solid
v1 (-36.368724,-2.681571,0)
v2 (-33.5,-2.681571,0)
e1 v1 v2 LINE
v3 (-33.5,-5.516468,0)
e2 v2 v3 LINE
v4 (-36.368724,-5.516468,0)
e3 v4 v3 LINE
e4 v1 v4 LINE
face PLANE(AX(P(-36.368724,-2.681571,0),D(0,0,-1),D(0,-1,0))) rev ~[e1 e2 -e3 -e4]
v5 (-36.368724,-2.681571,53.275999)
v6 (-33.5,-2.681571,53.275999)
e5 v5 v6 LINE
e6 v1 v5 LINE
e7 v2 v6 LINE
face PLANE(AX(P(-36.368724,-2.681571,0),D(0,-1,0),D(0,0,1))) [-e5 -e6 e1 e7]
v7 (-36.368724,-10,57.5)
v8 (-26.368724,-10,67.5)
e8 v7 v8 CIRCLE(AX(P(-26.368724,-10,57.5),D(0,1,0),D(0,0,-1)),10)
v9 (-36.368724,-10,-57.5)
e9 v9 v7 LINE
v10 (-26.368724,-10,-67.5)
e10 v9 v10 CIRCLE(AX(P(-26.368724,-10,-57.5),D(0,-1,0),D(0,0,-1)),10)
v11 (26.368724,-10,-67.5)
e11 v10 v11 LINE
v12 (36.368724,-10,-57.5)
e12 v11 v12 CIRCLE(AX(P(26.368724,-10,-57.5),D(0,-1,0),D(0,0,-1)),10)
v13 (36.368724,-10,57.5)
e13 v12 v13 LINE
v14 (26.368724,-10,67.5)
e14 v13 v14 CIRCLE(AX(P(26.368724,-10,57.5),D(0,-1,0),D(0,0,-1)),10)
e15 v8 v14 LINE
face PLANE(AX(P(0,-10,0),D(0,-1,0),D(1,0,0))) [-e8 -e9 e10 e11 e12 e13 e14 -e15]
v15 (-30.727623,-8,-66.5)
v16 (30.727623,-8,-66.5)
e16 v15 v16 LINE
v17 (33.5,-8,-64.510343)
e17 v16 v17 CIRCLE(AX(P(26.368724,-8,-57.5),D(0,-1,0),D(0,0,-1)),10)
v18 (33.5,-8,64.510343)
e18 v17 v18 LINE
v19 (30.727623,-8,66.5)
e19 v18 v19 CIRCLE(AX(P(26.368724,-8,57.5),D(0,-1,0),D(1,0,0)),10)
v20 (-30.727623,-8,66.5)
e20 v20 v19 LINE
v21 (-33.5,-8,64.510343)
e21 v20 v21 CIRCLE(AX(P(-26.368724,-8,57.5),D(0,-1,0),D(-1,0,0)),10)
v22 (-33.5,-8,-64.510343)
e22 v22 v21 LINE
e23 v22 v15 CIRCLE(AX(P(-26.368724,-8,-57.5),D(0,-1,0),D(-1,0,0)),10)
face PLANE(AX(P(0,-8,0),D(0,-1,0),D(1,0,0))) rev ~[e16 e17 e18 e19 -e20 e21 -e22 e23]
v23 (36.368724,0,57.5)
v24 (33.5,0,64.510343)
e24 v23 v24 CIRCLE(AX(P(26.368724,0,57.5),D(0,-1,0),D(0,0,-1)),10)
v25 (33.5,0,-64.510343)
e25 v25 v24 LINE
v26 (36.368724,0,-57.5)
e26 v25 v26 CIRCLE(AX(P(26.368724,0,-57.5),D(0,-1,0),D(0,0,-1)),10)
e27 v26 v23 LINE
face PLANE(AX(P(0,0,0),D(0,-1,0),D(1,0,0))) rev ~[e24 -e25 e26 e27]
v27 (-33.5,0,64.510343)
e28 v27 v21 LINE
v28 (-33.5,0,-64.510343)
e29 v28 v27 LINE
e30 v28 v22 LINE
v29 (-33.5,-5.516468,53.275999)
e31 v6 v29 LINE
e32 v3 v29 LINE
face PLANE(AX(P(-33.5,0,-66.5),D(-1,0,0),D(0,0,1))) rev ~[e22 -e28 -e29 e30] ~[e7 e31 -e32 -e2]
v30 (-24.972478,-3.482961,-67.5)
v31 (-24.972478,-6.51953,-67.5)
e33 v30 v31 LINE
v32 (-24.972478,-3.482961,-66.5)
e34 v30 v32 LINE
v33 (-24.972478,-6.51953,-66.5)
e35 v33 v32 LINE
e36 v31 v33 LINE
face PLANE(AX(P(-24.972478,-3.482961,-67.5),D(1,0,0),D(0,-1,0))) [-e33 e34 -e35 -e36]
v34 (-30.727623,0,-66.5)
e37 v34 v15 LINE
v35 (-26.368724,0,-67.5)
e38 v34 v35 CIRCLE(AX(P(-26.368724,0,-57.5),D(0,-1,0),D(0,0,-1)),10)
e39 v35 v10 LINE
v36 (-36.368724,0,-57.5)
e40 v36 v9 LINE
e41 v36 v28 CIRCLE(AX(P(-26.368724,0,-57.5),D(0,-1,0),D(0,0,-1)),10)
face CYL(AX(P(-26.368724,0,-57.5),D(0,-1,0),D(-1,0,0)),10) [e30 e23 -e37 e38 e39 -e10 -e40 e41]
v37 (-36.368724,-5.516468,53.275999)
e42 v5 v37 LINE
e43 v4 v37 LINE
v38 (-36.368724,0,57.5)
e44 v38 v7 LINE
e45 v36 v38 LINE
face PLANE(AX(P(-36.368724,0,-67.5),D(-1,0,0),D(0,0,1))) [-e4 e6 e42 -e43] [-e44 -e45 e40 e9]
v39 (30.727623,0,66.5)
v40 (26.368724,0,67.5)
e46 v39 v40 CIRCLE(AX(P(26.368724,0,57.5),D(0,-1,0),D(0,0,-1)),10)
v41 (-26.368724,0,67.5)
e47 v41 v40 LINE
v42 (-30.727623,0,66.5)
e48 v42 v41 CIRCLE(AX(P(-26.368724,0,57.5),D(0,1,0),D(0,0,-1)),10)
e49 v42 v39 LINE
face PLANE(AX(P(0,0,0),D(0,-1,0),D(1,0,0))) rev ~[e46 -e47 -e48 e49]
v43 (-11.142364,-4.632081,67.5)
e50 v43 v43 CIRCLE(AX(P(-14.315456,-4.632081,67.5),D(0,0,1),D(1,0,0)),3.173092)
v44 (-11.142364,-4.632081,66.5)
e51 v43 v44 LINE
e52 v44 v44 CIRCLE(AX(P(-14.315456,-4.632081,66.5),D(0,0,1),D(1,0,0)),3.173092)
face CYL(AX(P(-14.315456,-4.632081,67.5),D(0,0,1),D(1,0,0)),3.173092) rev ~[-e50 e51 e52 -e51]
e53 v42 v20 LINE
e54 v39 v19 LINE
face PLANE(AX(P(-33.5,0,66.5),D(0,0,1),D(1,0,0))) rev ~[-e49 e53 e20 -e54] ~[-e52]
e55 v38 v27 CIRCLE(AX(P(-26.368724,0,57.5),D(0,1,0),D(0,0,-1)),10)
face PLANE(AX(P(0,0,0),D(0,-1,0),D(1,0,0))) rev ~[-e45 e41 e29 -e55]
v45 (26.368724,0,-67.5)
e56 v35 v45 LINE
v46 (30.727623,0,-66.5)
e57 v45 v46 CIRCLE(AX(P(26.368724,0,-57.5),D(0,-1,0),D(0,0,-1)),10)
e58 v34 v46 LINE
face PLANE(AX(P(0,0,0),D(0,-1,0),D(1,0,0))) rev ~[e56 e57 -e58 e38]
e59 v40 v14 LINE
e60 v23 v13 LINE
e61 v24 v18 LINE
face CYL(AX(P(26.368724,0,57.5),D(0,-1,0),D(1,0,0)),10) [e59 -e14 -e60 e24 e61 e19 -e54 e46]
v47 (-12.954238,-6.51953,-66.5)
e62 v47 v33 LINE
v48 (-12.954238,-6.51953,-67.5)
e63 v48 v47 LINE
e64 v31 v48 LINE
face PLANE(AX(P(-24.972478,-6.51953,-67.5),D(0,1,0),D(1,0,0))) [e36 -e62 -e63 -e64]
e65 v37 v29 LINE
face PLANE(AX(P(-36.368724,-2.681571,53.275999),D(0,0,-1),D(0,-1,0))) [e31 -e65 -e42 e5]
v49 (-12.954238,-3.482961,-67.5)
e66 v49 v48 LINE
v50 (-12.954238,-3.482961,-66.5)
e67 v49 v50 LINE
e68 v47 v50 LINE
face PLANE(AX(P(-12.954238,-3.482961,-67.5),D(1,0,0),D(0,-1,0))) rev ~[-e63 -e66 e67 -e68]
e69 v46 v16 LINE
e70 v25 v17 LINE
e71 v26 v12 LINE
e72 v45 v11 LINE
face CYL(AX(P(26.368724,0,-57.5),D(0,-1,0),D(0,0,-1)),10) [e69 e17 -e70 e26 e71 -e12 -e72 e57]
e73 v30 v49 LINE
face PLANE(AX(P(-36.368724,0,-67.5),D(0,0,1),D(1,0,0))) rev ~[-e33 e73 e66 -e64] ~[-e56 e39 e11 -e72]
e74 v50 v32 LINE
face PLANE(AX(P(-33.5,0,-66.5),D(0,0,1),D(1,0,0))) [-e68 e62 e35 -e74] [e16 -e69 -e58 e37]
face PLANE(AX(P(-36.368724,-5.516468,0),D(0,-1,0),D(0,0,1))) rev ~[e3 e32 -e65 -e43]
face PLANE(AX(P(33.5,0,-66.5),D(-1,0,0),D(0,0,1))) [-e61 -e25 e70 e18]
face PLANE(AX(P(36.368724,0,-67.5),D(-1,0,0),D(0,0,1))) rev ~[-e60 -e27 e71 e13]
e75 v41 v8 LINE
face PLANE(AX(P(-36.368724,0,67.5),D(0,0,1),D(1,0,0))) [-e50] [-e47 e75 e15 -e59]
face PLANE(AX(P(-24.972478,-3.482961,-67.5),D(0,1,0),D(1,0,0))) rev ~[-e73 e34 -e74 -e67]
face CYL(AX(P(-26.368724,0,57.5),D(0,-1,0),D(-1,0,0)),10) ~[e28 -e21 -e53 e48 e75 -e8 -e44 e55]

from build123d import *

# Parameters (mm, degrees)
F0_W      = 72.7374479175
F0_H      = 135
F1_DEPTH  = 10
F2_R      = 10
F3_W      = 67
F3_H      = 133
F4_DEPTH  = 8
F5_W      = 12.0182400569
F5_H      = 3.036568407
F6_DEPTH  = 25
F7_R      = 3.1730919104
F8_DEPTH  = 12
F9_W      = 2.8348967899
F9_H      = 53.2759986818
F10_DEPTH = 12


# Not quite as in the source:
# - a feature of the source that left no trace in its solid (it failed there, or was rolled back) is left out


with BuildPart() as f1:
    # F0 (on Front) → F1 (new body)
    with BuildSketch(Plane.XZ):
        Rectangle(F0_W, F0_H)
    extrude(amount=F1_DEPTH)

    # F2
    f2_edges = [f1.edges().sort_by_distance(p)[0] for p in [
        (36.368724, -5, 67.5),
        (-36.368724, -5, 67.5),
        (-36.368724, -5, -67.5),
        (36.368724, -5, -67.5),
    ]]
    fillet(f2_edges, radius=F2_R)

    # F3 (on Front) → F4 (cut)
    with BuildSketch(Plane.XZ):
        Rectangle(F3_W, F3_H)
    extrude(amount=F4_DEPTH, mode=Mode.SUBTRACT)

    # F5 (on face) → F6 (cut)
    with BuildSketch(Plane(origin=(0, 0, -67.5), x_dir=(1, 0, 0), z_dir=(0, 0, -1))):
        with Locations((-18.9633578993, 5.0012452994)):
            Rectangle(F5_W, F5_H)
    extrude(amount=-F6_DEPTH, mode=Mode.SUBTRACT)

    # F7 (on face) → F8 (cut)
    with BuildSketch(Plane.XY.offset(67.5)):
        with Locations((-14.315456152, -4.6320809051)):
            Circle(F7_R)
    extrude(amount=-F8_DEPTH, mode=Mode.SUBTRACT)

    # F9 (on face) → F10 (cut)
    with BuildSketch(Plane(origin=(-36.3687239587, 0, 0), x_dir=(0, -1, 0), z_dir=(-1, 0, 0))):
        with Locations((4.099019221, 26.6379993409)):
            Rectangle(F9_W, F9_H)
    extrude(amount=-F10_DEPTH, mode=Mode.SUBTRACT)


solid = f1.part
